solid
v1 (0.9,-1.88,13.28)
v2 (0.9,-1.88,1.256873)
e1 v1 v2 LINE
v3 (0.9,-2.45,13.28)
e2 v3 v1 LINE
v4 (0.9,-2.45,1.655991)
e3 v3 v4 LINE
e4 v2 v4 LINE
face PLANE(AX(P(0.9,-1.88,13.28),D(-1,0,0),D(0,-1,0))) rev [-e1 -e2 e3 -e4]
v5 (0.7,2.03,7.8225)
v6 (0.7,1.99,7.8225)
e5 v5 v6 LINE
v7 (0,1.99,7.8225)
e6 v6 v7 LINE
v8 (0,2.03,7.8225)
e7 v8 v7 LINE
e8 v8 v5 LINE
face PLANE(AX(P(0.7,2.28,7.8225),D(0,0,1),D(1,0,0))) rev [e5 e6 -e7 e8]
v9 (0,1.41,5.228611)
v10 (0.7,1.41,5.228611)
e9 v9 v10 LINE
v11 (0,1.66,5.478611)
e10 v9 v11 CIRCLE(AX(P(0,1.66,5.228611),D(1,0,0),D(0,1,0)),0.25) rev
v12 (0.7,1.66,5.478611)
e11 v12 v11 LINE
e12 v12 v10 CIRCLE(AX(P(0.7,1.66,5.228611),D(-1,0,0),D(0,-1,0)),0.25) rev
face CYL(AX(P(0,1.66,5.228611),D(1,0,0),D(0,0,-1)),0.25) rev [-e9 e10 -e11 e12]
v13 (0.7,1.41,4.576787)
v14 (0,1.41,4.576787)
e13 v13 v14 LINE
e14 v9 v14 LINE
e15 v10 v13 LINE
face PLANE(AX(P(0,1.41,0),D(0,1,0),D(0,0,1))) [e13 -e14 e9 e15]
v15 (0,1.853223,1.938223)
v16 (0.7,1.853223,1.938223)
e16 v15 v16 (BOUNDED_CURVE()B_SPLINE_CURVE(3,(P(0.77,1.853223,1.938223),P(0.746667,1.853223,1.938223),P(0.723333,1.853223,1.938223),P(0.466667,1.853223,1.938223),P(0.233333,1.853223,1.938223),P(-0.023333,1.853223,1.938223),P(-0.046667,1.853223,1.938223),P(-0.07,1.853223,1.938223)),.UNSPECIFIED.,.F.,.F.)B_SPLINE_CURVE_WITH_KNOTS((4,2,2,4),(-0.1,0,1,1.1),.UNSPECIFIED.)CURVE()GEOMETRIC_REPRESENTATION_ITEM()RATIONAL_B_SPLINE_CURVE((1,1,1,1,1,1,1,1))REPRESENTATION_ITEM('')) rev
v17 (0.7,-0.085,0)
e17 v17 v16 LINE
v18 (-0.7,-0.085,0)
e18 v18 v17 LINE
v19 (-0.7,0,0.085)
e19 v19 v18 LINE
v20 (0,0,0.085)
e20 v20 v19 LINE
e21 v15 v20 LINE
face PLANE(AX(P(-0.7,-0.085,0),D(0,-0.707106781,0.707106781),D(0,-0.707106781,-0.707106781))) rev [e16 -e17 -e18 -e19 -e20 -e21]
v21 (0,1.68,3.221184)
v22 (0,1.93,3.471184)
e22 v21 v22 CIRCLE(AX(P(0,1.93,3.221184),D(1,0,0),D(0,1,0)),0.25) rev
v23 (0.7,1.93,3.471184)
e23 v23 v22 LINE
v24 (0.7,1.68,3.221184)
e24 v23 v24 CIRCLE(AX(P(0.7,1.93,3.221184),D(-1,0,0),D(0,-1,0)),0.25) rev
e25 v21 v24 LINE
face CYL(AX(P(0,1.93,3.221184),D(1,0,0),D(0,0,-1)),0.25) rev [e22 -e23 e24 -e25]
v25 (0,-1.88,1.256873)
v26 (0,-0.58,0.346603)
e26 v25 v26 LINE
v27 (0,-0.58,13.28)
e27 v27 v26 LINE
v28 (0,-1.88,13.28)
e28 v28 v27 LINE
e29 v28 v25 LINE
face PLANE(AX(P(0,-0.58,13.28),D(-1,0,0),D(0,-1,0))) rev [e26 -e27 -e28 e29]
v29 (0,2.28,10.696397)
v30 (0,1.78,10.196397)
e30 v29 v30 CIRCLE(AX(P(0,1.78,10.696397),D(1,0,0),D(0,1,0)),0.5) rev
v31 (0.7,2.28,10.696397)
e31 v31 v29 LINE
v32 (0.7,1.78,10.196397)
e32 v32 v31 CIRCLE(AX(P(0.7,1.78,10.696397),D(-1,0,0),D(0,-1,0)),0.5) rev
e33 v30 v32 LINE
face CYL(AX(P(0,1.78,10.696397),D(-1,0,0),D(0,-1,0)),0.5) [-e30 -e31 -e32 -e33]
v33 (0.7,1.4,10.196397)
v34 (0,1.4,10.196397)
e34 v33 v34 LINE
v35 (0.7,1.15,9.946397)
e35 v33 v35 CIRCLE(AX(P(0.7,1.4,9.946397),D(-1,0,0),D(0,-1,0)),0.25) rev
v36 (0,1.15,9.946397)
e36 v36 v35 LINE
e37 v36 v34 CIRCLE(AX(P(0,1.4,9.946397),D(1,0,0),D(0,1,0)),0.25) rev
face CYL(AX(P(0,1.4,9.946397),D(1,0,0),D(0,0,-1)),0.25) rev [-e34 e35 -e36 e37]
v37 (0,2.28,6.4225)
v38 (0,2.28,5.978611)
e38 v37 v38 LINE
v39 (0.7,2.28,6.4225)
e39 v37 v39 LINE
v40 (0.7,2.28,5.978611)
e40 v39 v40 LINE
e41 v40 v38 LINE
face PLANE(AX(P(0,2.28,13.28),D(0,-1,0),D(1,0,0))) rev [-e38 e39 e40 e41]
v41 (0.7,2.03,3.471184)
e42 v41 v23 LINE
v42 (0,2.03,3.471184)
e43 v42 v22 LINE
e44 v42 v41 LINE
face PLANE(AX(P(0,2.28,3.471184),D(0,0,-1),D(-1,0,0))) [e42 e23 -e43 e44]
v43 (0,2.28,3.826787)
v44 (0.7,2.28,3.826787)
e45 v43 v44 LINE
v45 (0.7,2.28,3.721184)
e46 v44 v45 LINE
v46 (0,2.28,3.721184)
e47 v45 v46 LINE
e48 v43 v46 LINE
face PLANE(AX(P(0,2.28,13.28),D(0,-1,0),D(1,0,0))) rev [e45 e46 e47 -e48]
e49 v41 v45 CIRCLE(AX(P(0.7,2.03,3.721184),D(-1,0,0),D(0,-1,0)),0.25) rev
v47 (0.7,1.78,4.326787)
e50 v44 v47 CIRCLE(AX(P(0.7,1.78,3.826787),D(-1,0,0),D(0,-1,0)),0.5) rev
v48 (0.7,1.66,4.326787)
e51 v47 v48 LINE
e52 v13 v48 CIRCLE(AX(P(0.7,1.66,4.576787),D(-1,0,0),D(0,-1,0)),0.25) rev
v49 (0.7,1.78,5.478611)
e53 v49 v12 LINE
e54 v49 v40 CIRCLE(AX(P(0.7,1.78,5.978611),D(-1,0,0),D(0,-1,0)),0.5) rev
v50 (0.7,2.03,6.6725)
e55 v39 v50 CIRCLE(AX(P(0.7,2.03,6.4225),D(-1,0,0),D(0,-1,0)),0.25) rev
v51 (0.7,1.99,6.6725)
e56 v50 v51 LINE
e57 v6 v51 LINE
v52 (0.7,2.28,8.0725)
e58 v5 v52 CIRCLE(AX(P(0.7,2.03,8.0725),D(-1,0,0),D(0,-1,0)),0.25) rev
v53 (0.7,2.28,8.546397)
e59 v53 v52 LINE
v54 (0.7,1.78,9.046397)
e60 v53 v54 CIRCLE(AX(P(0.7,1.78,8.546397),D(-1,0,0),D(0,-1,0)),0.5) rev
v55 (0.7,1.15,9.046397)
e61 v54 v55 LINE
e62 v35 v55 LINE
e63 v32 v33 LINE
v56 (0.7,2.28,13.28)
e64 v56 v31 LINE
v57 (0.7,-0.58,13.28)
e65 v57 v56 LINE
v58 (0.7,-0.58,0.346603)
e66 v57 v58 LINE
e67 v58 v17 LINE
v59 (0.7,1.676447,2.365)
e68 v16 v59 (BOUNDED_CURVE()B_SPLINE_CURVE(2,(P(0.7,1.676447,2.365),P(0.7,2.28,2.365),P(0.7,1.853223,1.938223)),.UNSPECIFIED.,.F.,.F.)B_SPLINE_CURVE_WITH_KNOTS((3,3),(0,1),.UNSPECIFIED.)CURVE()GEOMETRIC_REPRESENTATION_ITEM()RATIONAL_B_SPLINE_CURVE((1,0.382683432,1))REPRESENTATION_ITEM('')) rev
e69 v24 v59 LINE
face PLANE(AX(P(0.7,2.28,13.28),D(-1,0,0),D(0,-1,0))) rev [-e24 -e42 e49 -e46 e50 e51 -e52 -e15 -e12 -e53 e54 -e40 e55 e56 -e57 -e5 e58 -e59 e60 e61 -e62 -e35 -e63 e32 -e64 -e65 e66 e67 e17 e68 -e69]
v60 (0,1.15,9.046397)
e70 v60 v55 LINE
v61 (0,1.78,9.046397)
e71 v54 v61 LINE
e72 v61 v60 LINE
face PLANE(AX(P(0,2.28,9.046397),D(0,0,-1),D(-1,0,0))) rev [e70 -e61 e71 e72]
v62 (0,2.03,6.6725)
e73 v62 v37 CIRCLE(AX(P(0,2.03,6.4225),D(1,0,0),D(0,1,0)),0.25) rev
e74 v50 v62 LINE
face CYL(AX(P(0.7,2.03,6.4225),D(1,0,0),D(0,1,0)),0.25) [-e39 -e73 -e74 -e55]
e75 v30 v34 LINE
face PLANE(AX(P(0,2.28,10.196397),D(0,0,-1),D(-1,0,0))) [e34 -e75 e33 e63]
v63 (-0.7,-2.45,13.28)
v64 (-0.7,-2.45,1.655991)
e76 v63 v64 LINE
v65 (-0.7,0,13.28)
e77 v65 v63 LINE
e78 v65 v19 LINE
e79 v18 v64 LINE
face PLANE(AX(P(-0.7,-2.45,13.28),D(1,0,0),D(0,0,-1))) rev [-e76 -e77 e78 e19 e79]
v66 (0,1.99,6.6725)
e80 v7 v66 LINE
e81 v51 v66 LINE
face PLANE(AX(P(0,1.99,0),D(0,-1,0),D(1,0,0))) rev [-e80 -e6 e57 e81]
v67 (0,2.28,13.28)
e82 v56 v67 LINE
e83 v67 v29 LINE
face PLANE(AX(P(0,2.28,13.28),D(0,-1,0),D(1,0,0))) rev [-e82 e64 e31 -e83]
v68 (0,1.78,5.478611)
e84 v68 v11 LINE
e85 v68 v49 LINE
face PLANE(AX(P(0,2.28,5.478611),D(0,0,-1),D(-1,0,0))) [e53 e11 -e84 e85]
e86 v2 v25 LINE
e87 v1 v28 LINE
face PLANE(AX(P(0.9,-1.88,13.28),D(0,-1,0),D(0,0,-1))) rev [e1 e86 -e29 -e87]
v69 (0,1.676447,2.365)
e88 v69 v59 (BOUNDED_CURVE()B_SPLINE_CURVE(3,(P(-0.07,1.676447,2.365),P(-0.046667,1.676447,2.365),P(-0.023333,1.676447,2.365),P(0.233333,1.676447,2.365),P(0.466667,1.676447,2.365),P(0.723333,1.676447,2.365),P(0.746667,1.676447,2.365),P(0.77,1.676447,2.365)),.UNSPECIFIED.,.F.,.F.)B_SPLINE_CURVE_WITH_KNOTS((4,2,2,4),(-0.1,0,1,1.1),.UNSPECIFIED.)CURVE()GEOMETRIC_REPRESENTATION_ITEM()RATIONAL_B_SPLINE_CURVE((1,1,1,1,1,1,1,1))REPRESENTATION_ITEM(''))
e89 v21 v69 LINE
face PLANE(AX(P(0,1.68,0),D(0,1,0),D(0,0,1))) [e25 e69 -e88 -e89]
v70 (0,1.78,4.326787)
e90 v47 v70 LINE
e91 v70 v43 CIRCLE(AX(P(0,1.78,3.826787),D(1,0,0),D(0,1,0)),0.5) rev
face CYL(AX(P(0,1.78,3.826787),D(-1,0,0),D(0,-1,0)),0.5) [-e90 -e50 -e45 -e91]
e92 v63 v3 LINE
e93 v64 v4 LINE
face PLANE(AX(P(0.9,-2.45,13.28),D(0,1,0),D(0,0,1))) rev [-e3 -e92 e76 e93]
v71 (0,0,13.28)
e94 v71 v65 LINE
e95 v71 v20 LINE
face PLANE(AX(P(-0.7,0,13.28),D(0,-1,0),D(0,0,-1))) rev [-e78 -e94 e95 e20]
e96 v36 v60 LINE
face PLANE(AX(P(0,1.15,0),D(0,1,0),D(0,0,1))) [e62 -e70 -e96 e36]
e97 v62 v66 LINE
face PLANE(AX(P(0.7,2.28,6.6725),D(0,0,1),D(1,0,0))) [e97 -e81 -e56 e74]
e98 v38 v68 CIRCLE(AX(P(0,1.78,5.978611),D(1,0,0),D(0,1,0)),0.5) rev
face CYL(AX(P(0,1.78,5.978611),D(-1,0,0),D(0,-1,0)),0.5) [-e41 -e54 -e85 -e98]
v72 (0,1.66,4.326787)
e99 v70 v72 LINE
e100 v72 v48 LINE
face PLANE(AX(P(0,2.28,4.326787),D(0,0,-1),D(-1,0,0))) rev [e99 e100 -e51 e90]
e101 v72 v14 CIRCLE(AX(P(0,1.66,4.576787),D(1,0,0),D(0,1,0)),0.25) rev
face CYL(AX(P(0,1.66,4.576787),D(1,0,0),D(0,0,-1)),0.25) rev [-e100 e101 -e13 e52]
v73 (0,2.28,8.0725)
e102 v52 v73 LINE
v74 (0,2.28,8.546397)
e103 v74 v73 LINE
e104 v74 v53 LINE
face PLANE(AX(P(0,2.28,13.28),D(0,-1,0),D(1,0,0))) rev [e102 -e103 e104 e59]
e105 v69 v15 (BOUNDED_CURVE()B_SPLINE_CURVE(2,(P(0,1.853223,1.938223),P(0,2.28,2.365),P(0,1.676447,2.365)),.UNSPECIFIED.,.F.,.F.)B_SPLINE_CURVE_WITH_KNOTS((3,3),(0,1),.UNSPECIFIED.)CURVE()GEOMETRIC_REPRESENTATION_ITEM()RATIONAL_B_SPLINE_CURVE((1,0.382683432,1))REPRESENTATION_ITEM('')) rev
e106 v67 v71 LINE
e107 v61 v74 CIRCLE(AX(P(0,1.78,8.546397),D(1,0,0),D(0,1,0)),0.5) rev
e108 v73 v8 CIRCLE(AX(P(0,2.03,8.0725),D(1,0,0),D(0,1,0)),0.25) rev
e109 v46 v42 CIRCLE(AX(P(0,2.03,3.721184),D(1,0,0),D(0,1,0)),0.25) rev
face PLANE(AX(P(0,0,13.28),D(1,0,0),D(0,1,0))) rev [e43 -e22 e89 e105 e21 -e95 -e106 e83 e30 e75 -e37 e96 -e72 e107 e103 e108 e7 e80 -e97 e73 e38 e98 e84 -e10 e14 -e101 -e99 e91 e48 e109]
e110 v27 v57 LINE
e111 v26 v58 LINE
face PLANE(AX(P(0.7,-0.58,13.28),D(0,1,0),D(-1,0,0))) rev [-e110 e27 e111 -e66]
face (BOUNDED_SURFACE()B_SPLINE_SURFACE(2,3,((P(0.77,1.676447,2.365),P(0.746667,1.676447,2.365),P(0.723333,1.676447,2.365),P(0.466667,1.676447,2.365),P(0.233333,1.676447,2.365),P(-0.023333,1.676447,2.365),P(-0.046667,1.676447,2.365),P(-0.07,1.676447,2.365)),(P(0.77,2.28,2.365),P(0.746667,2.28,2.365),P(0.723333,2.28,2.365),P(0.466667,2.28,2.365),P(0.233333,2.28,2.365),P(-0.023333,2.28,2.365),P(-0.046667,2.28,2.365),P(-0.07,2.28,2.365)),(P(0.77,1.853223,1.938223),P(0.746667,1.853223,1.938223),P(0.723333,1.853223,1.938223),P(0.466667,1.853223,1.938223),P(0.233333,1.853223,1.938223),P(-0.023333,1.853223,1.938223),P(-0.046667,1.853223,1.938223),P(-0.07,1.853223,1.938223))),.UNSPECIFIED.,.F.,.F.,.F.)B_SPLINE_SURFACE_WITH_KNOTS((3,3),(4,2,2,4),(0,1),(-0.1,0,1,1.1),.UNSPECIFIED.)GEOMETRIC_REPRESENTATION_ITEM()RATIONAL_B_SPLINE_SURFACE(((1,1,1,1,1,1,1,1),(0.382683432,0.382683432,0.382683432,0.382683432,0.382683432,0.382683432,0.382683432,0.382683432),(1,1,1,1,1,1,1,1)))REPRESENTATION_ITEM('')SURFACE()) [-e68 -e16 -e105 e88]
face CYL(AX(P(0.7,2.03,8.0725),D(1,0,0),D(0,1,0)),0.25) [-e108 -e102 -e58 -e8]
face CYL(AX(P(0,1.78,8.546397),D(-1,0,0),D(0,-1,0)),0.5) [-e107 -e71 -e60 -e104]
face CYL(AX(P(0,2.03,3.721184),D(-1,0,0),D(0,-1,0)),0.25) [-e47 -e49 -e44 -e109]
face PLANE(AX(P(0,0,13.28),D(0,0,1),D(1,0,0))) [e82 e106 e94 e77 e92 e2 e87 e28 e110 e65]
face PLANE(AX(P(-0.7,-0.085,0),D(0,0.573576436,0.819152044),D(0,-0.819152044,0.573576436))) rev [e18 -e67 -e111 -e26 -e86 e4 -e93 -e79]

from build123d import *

# Parameters (mm, degrees)
BOSS_EXTRUDE1_DEPTH     = 13.28
CUT_EXTRUDE1_DEPTH      = 14.53406443
CUT_EXTRUDE1_DEPTH_BACK = 14.53406443
CUT_EXTRUDE5_DEPTH      = 0.29
CUT_EXTRUDE6_DEPTH      = 1.13
CUT_EXTRUDE7_DEPTH      = 0.87
CUT_EXTRUDE8_DEPTH      = 0.6
FILLET7_R               = 0.5
FILLET8_R               = 0.5
FILLET13_R              = 0.25
FILLET14_R              = 0.25
FILLET15_R              = 0.5
FILLET16_R              = 0.5
FILLET18_R              = 0.25
FILLET19_R              = 0.25
FILLET20_R              = 0.25
FILLET21_R              = 0.25
FILLET23_R              = 0.25
FILLET25_R              = 0.25


with BuildPart() as part:
    # Sketch1 → Boss-Extrude1 (new body)
    with BuildSketch(Plane.XY):
        Polygon((0, 0), (0, 2.28), (0.7, 2.28), (0.7, -0.58), (0, -0.58), (0, -1.88), (0.9, -1.88), (0.9, -2.45), (-0.7, -2.45), (-0.7, 0), align=None)
    extrude(amount=BOSS_EXTRUDE1_DEPTH)

    # Sketch2 → Cut-Extrude1 (cut, two sides: drawn at the far end of the back side and taken through both)
    with BuildSketch(Plane(origin=(0, 0, 0), x_dir=(0, 0, -1), z_dir=(1, 0, 0)).offset(-CUT_EXTRUDE1_DEPTH_BACK)):
        Polygon((0.8, -2.75), (0.8, -0.085), (0.8, 2.58), (-2.665, 2.58), (0, -0.085), (-1.866053089, -2.75), align=None)
    extrude(amount=CUT_EXTRUDE1_DEPTH + CUT_EXTRUDE1_DEPTH_BACK, mode=Mode.SUBTRACT)

    # 3DSketch1 → Cut-Extrude5 (cut)
    with BuildSketch(Plane(origin=(0.7, 2.28, 7.8225), x_dir=(-0.5199469468957453, 0, -0.8541985556144386), z_dir=(0, 1, 0))):
        Polygon((0, 0), (0.982328339, -0.597938989), (1.346291202, 0), (0.363962863, 0.597938989), align=None)
    extrude(amount=-CUT_EXTRUDE5_DEPTH, mode=Mode.SUBTRACT)

    # 3DSketch1<3> → Cut-Extrude6 (cut)
    with BuildSketch(Plane(origin=(0, 2.28, 10.196397445), x_dir=(0.5199469468957453, 0, -0.8541985556144386), z_dir=(0, 1, 0))):
        Polygon((0, 0), (0.982328339, 0.597938989), (1.346291202, 0), (0.363962863, -0.597938989), align=None)
    extrude(amount=-CUT_EXTRUDE6_DEPTH, mode=Mode.SUBTRACT)

    # 3DSketch1<4> → Cut-Extrude7 (cut)
    with BuildSketch(Plane(origin=(0, 2.28, 5.478611146), x_dir=(0.519345577670118, 0, -0.8545643164528294), z_dir=(0, 1, 0))):
        Polygon((0, 0), (0.984308217, 0.598195022), (1.347850122, 0), (0.363541904, -0.598195022), align=None)
    extrude(amount=-CUT_EXTRUDE7_DEPTH, mode=Mode.SUBTRACT)

    # 3DSketch1<5> → Cut-Extrude8 (cut)
    with BuildSketch(Plane(origin=(0, 2.28, 10.196397445), x_dir=(0.08902885316147792, 0, -0.9960290474201804), z_dir=(0, -1, 0))):
        Polygon((0, 0), (1.145433405, -0.102383181), (1.207753602, 0.594837152), (0.062320197, 0.697220333), align=None)
        Polygon((4.699052194, -0.420019104), (5.846302971, -0.522564728), (5.908623168, 0.174655605), (4.761372391, 0.277201229), align=None)
        Polygon((6.698507562, -0.598738006), (7.800299337, -0.697220333), (7.862619534, 0), (6.760827759, 0.098482327), align=None)
    extrude(amount=CUT_EXTRUDE8_DEPTH, mode=Mode.SUBTRACT)

    # Fillet7
    fillet7_edges = [part.edges().sort_by_distance(p)[0] for p in [
        (0.35, 2.28, 9.046397445),
    ]]
    fillet(fillet7_edges, radius=FILLET7_R)

    # Fillet8
    fillet8_edges = [part.edges().sort_by_distance(p)[0] for p in [
        (0.35, 2.28, 10.196397445),
    ]]
    fillet(fillet8_edges, radius=FILLET8_R)

    # Fillet13
    fillet13_edges = [part.edges().sort_by_distance(p)[0] for p in [
        (0.35, 2.28, 6.6725),
    ]]
    fillet(fillet13_edges, radius=FILLET13_R)

    # Fillet14
    fillet14_edges = [part.edges().sort_by_distance(p)[0] for p in [
        (0.35, 2.28, 7.8225),
    ]]
    fillet(fillet14_edges, radius=FILLET14_R)

    # Fillet15
    fillet15_edges = [part.edges().sort_by_distance(p)[0] for p in [
        (0.35, 2.28, 5.478611146),
    ]]
    fillet(fillet15_edges, radius=FILLET15_R)

    # Fillet16
    fillet16_edges = [part.edges().sort_by_distance(p)[0] for p in [
        (0.35, 2.28, 4.326786528),
    ]]
    fillet(fillet16_edges, radius=FILLET16_R)

    # Fillet18
    fillet18_edges = [part.edges().sort_by_distance(p)[0] for p in [
        (0.35, 2.28, 3.471184381),
    ]]
    fillet(fillet18_edges, radius=FILLET18_R)

    # Fillet19
    # the kernel refuses this fillet: 0.25 mm, written as the material it takes off along each edge
    with BuildSketch(Plane(origin=(2.208795436, 2.28, 2.365), x_dir=(0, -1, 0), z_dir=(-1, 0, 0))) as fillet19_piece_1:
        with BuildLine():
            CenterArc((0.603528489, -0.249975098), FILLET19_R, 90.808696936, 134.191303064)
            Line((0.426751794, -0.426751794), (0.42321626, -0.430287327))
            Line((0.42321626, -0.430287327), (-0.003535534, -0.003535534))
            Line((-0.003535534, -0.003535534), (0, 0.005))
            ThreePointArc((0, 0.005), (0.3, 0.005), (0.59992943, 0.004999502))
            Line((0.59992943, 0.004999502), (0.6, 0))
        make_face()
    extrude(amount=3.717590871, mode=Mode.SUBTRACT)

    # Fillet20
    fillet20_edges = [part.edges().sort_by_distance(p)[0] for p in [
        (0.35, 1.68, 3.471184381),
    ]]
    fillet(fillet20_edges, radius=FILLET20_R)

    # Fillet21
    fillet21_edges = [part.edges().sort_by_distance(p)[0] for p in [
        (0.35, 1.41, 4.326786528),
    ]]
    fillet(fillet21_edges, radius=FILLET21_R)

    # Fillet23
    fillet23_edges = [part.edges().sort_by_distance(p)[0] for p in [
        (0.35, 1.41, 5.478611146),
    ]]
    fillet(fillet23_edges, radius=FILLET23_R)

    # Fillet25
    fillet25_edges = [part.edges().sort_by_distance(p)[0] for p in [
        (0.35, 1.15, 10.196397445),
    ]]
    fillet(fillet25_edges, radius=FILLET25_R)


solid = part.part
